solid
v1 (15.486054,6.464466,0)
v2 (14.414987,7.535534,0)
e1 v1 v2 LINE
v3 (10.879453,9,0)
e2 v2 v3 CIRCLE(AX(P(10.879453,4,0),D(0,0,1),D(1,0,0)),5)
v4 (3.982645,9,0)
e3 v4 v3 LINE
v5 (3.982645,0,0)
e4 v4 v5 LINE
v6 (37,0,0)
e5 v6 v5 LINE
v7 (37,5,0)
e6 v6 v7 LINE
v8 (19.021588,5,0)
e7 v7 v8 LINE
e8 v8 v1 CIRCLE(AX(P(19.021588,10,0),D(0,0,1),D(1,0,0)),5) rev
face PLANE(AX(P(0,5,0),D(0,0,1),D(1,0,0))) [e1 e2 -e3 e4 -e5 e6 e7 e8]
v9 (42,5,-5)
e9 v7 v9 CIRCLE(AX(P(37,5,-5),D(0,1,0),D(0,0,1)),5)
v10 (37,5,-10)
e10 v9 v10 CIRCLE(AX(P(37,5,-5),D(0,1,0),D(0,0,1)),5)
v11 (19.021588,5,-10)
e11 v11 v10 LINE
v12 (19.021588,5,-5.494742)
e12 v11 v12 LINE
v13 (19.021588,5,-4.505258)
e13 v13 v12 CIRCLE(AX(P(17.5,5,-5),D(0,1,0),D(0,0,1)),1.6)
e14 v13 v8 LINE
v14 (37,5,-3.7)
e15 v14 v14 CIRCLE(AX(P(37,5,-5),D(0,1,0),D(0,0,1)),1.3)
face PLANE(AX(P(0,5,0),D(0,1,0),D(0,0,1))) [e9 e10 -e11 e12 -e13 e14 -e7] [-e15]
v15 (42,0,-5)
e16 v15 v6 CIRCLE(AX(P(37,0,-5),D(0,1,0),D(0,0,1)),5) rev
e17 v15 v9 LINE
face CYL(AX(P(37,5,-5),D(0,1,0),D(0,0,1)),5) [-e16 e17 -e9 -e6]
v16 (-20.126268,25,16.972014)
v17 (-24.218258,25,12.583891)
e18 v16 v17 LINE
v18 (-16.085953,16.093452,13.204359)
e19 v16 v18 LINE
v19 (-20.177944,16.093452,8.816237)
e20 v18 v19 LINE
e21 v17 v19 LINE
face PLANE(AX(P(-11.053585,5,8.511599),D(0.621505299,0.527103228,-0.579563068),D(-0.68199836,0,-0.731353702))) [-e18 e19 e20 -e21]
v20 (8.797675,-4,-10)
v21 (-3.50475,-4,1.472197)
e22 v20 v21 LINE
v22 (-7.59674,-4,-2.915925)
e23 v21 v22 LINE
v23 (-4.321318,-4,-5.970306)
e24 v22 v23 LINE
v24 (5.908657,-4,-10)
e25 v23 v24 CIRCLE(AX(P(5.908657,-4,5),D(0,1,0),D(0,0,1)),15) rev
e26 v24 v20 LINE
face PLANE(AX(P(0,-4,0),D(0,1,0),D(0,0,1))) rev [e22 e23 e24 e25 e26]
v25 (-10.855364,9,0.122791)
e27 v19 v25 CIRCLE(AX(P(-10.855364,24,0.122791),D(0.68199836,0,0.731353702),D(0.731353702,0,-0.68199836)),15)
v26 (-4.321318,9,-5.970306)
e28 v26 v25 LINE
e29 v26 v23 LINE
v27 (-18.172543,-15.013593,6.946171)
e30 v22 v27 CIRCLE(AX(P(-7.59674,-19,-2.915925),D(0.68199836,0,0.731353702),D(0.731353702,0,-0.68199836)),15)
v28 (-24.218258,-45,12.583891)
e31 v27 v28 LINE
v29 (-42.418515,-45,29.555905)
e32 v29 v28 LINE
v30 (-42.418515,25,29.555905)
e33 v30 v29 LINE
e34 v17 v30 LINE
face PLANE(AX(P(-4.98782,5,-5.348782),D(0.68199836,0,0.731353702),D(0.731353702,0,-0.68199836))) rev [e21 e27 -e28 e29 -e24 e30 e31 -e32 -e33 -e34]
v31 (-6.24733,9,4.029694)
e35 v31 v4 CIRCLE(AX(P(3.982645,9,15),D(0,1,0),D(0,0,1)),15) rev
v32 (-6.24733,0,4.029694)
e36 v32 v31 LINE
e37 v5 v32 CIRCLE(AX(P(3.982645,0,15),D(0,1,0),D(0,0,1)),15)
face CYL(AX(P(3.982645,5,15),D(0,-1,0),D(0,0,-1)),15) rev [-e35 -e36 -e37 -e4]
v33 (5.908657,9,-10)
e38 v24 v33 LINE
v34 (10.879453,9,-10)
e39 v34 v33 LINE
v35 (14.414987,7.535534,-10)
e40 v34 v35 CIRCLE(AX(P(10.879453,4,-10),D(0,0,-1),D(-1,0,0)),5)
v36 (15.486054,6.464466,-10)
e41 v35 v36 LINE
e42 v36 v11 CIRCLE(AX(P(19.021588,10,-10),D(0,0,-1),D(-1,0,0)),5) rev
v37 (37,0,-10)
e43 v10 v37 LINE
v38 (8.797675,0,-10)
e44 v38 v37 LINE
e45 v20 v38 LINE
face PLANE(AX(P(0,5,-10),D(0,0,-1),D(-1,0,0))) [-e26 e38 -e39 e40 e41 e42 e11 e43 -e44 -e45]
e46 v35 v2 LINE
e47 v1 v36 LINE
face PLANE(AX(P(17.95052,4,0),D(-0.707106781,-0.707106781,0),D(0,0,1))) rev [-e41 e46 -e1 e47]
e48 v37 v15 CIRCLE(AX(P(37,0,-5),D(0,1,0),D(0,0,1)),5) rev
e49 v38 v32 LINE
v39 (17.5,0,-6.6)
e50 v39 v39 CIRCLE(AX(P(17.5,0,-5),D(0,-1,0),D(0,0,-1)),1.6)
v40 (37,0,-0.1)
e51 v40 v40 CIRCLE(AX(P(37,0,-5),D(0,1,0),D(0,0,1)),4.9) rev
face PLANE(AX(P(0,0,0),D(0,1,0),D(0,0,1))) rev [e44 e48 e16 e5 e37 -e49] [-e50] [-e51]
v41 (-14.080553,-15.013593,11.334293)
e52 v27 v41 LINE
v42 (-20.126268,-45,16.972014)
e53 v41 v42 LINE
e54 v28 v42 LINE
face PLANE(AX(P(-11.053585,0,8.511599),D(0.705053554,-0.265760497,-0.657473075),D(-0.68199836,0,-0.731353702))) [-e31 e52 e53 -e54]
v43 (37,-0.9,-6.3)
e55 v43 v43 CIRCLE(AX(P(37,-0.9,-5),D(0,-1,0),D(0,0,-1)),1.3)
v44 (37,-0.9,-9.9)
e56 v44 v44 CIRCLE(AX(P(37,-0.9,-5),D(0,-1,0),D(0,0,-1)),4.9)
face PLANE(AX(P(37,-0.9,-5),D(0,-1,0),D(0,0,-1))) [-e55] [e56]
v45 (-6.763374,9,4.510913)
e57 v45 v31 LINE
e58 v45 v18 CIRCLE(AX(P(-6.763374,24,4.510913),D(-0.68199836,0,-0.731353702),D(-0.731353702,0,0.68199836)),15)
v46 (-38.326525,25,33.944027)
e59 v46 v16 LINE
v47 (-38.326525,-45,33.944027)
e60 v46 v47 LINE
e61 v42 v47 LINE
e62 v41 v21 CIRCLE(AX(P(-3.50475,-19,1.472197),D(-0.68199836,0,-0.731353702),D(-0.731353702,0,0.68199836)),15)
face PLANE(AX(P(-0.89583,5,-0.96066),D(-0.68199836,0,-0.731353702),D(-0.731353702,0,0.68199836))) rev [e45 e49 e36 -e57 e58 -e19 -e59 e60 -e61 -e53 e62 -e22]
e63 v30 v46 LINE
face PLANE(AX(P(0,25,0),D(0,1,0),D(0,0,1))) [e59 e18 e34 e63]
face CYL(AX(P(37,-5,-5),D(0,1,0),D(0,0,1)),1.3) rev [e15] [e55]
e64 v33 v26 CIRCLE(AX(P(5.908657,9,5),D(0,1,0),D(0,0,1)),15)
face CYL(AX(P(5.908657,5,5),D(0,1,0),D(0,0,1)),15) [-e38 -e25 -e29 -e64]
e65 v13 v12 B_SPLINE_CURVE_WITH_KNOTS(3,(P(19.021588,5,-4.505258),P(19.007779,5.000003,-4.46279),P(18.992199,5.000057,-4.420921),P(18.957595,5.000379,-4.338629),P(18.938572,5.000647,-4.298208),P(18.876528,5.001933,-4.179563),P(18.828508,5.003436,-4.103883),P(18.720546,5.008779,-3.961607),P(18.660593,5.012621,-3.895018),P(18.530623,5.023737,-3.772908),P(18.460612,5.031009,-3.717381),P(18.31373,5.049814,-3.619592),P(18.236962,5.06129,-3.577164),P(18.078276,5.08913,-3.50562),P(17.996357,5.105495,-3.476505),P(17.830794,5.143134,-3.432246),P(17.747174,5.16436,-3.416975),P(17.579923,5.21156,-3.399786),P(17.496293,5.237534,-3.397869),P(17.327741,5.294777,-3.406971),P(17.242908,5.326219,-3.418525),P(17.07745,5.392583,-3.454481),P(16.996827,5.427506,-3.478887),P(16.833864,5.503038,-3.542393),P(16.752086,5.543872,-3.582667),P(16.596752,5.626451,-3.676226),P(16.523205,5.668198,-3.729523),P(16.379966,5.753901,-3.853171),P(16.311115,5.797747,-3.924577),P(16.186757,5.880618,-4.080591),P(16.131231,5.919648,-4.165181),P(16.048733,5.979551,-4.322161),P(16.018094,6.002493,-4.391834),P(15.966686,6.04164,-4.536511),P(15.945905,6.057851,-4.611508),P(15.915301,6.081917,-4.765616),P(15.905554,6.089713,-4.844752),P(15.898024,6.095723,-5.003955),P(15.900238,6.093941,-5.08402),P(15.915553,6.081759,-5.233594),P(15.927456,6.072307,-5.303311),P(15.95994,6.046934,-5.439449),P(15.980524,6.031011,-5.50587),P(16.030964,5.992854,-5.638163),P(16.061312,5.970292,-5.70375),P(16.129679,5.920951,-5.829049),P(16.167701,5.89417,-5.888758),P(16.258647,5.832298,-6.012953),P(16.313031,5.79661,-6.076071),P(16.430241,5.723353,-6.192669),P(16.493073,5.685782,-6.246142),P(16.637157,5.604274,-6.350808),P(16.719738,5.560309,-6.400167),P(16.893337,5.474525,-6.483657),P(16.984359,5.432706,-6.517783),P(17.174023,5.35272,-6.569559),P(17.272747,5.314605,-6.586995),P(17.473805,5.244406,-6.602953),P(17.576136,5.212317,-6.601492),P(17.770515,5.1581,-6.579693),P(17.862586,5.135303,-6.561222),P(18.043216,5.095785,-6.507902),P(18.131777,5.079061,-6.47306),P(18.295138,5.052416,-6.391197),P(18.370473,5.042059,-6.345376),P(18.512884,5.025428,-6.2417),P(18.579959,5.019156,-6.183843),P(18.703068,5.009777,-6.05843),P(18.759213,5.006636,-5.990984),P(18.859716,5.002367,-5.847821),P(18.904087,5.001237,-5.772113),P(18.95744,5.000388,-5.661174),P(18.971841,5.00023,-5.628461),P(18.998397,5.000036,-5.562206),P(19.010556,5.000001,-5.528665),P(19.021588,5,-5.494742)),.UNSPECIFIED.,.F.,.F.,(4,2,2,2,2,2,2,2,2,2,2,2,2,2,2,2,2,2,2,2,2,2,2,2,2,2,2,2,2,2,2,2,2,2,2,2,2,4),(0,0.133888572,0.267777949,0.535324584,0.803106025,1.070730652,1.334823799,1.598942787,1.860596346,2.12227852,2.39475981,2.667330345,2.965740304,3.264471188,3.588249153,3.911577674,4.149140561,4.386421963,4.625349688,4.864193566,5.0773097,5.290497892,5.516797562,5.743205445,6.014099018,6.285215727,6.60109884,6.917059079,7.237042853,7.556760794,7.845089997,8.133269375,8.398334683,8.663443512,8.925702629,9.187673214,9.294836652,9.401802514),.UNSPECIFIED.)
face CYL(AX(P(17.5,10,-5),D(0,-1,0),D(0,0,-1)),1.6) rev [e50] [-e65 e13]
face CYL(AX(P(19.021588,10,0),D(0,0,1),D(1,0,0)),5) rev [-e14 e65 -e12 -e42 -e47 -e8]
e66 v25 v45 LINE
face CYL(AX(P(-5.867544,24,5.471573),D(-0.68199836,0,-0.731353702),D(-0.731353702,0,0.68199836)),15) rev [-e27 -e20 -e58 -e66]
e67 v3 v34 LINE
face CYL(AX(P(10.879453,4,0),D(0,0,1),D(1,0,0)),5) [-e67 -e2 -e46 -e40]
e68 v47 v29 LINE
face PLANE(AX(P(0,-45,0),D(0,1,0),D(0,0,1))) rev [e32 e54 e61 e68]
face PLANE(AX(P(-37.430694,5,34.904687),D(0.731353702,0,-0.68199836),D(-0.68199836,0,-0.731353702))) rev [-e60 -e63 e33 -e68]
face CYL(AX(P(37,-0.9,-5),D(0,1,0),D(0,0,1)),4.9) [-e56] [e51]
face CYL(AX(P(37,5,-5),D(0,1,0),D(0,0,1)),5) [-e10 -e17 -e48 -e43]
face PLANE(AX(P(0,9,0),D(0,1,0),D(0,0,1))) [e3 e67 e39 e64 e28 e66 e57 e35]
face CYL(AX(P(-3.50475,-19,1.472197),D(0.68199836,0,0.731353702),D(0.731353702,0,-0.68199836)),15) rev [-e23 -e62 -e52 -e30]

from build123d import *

# Parameters (mm, degrees)
BOSS_EXTRUDE1_DEPTH = 5
FILLET1_R           = 5
SKETCH2_R           = 1.2999999999999945
CUT_EXTRUDE1_DEPTH  = 10
BOSS_EXTRUDE2_DEPTH = 20
BOSS_EXTRUDE3_DEPTH = 45
BOSS_EXTRUDE4_DEPTH = 6
SKETCH6_R           = 4.900000000000002
SKETCH6_R_2         = 1.299999999999994
BOSS_EXTRUDE5_DEPTH = 0.9
BOSS_EXTRUDE6_DEPTH = 3.9999999999999964
BOSS_EXTRUDE7_DEPTH = 3.9999999999999964
FILLET2_R           = 15
FILLET7_SIZE        = 5
FILLET8_R           = 5
SKETCH11_R          = 1.6000000000000019
CUT_EXTRUDE2_DEPTH  = 10


# Some blends are built 0.0001 mm under size
with BuildPart() as part:
    # Sketch1 → Boss-Extrude1 (new body)
    with BuildSketch(Plane(origin=(0, 0, 0), x_dir=(1, 0, 0), z_dir=(0, 1, 0))):
        Polygon((4.091990160374978, 5.611877790284978), (0, 10), (0, 1.79603523340848), align=None)
        Polygon((0, 1.79603523340848), (0, 10), (-42.4185146939121, -29.55590488362469), (-38.32652453353713, -33.94402709333974), (-1.9260119864091507, 0), align=None)
        Polygon((42, 10), (0, 10), (4.091990160374978, 5.611877790284978), (0, 1.7960352334084817), (0, 0), (42, 0), align=None)
        Polygon((0, 0), (0, 1.79603523340848), (-1.9260119864091507, 0), align=None)
    extrude(amount=BOSS_EXTRUDE1_DEPTH)

    # Fillet1
    fillet1_edges = [part.edges().sort_by_distance(p)[0] for p in [
        (42, 2.5, 0),
        (42, 2.5, -10),
    ]]
    fillet(fillet1_edges, radius=FILLET1_R - 0.0001)  # a hair under: the kernel refuses the full size

    # Sketch2 → Cut-Extrude1 (cut)
    with BuildSketch(Plane(origin=(0, 5, 0), x_dir=(1, 0, 0), z_dir=(0, 1, 0))):
        with Locations(Location((37.00000000000001, 4.999999999999989, 0), (0, 0, 270))):
            Circle(SKETCH2_R)
    extrude(amount=-CUT_EXTRUDE1_DEPTH, mode=Mode.SUBTRACT)

    # Sketch3 → Boss-Extrude2 (add)
    with BuildSketch(Plane(origin=(0, 5, 0), x_dir=(1, 0, 0), z_dir=(0, 1, 0))):
        Polygon((-42.4185146939121, -29.55590488362471), (-38.32652453353713, -33.94402709333974), (-20.126268259973138, -16.97201354666987), (-24.21825842034811, -12.583891336954824), align=None)
    extrude(amount=BOSS_EXTRUDE2_DEPTH)

    # Sketch4 → Boss-Extrude3 (add)
    with BuildSketch(Plane.XZ):
        Polygon((-42.4185146939121, 29.55590488362471), (-38.32652453353713, 33.94402709333974), (-20.126268259973134, 16.972013546669885), (-24.218258420348107, 12.583891336954828), align=None)
    extrude(amount=BOSS_EXTRUDE3_DEPTH)

    # Sketch5 → Boss-Extrude4 (add)
    with BuildSketch(Plane(origin=(-4.987820251299118, 0, -5.348782368720677), x_dir=(-0.7313537016191739, 0, 0.6819983600624947), z_dir=(-0.6819983600624948, 0, -0.731353701619174))):
        Polygon((26.29430619749914, -45), (26.29430619749914, 0), (13.888976828400956, 0), align=None)
        Polygon((13.888976828400958, 5), (26.29430619749914, 25), (26.29430619749914, 5), align=None)
    extrude(amount=-BOSS_EXTRUDE4_DEPTH)

    # Sketch6 → Boss-Extrude5 (add)
    with BuildSketch(Plane.XZ):
        with Locations(Location((37.00000000000001, -4.999999999999989, 0), (0, 0, 90))):
            Circle(SKETCH6_R)
        with Locations(Location((37.00000000000001, -4.999999999999989, 0), (0, 0, 90))):
            Circle(SKETCH6_R_2, mode=Mode.SUBTRACT)
    extrude(amount=BOSS_EXTRUDE5_DEPTH)

    # Sketch8 → Boss-Extrude6 (add)
    with BuildSketch(Plane.XZ):
        Polygon((0, -10), (-19.681916643400598, 8.353684194074795), (-15.589926483025625, 12.741806403789838), (8.797675113837775, -10), align=None)
    extrude(amount=BOSS_EXTRUDE6_DEPTH)

    # Sketch9 → Boss-Extrude7 (add)
    with BuildSketch(Plane(origin=(0, 5, 0), x_dir=(1, 0, 0), z_dir=(0, 1, 0))):
        Polygon((0, 10), (-20.085147023573704, -8.729702606775238), (-16.79961762354496, -13.869861641891177), (-1.92601198640914, -7.11e-15), (17.950520425486616, 5.22e-15), (17.950520425486616, 10), align=None)
    extrude(amount=BOSS_EXTRUDE7_DEPTH)

    # Fillet2
    fillet2_edges = [part.edges().sort_by_distance(p)[0] for p in [
        (-14.914116497044613, 8.999999999999996, 8.009621013204297),
        (-1.9260119864091478, 4.499999999999998, 2.06e-15),
        (0, 2.5, -10),
        (-13.906040546611829, -3.9999999999999973, 7.069574981453184),
    ]]
    fillet(fillet2_edges, radius=FILLET2_R)

    # Fillet7
    # the kernel refuses this chamfer: 5 mm, written as the material it takes off along each edge
    with BuildSketch(Plane(origin=(17.950520425486616, 8.999999999999996, 12.858414939829549), x_dir=(0.027495876610586317, -0.9996219169112968, 0), z_dir=(0, 0, -1))) as fillet7_piece_1_section:
        Polygon((FILLET7_SIZE * 0.999621916911, FILLET7_SIZE * 0.0274958766106), (-FILLET7_SIZE * 0.0274958766106, FILLET7_SIZE * 0.999621916911), (0, 0), align=None)
    fillet7_piece_1 = extrude(amount=35.71682987965911, mode=Mode.PRIVATE)
    fillet7_piece_1 = split(fillet7_piece_1, bisect_by=Plane(origin=(16.221928363932022, 5, -5.000000000000004), z_dir=(0, 1, 0)), keep=Keep.TOP, mode=Mode.PRIVATE)
    add(fillet7_piece_1, mode=Mode.SUBTRACT)

    # Fillet8
    fillet8_edges = [part.edges().sort_by_distance(p)[0] for p in [
        (12.95052042548848, 8.999999999998002, -5.000000000000002),
        (16.950520425489678, 5, -4.999999999999999),
    ]]
    fillet(fillet8_edges, radius=FILLET8_R)

    # Sketch11 → Cut-Extrude2 (cut)
    with BuildSketch(Plane(origin=(0, 0, 0), x_dir=(-1, 0, 0), z_dir=(0, -1, 0))):
        with Locations(Location((-17.499999999999993, 5.000000000000053, 0), (0, 0, 90))):
            Circle(SKETCH11_R)
    extrude(amount=-CUT_EXTRUDE2_DEPTH, mode=Mode.SUBTRACT)


solid = part.part
